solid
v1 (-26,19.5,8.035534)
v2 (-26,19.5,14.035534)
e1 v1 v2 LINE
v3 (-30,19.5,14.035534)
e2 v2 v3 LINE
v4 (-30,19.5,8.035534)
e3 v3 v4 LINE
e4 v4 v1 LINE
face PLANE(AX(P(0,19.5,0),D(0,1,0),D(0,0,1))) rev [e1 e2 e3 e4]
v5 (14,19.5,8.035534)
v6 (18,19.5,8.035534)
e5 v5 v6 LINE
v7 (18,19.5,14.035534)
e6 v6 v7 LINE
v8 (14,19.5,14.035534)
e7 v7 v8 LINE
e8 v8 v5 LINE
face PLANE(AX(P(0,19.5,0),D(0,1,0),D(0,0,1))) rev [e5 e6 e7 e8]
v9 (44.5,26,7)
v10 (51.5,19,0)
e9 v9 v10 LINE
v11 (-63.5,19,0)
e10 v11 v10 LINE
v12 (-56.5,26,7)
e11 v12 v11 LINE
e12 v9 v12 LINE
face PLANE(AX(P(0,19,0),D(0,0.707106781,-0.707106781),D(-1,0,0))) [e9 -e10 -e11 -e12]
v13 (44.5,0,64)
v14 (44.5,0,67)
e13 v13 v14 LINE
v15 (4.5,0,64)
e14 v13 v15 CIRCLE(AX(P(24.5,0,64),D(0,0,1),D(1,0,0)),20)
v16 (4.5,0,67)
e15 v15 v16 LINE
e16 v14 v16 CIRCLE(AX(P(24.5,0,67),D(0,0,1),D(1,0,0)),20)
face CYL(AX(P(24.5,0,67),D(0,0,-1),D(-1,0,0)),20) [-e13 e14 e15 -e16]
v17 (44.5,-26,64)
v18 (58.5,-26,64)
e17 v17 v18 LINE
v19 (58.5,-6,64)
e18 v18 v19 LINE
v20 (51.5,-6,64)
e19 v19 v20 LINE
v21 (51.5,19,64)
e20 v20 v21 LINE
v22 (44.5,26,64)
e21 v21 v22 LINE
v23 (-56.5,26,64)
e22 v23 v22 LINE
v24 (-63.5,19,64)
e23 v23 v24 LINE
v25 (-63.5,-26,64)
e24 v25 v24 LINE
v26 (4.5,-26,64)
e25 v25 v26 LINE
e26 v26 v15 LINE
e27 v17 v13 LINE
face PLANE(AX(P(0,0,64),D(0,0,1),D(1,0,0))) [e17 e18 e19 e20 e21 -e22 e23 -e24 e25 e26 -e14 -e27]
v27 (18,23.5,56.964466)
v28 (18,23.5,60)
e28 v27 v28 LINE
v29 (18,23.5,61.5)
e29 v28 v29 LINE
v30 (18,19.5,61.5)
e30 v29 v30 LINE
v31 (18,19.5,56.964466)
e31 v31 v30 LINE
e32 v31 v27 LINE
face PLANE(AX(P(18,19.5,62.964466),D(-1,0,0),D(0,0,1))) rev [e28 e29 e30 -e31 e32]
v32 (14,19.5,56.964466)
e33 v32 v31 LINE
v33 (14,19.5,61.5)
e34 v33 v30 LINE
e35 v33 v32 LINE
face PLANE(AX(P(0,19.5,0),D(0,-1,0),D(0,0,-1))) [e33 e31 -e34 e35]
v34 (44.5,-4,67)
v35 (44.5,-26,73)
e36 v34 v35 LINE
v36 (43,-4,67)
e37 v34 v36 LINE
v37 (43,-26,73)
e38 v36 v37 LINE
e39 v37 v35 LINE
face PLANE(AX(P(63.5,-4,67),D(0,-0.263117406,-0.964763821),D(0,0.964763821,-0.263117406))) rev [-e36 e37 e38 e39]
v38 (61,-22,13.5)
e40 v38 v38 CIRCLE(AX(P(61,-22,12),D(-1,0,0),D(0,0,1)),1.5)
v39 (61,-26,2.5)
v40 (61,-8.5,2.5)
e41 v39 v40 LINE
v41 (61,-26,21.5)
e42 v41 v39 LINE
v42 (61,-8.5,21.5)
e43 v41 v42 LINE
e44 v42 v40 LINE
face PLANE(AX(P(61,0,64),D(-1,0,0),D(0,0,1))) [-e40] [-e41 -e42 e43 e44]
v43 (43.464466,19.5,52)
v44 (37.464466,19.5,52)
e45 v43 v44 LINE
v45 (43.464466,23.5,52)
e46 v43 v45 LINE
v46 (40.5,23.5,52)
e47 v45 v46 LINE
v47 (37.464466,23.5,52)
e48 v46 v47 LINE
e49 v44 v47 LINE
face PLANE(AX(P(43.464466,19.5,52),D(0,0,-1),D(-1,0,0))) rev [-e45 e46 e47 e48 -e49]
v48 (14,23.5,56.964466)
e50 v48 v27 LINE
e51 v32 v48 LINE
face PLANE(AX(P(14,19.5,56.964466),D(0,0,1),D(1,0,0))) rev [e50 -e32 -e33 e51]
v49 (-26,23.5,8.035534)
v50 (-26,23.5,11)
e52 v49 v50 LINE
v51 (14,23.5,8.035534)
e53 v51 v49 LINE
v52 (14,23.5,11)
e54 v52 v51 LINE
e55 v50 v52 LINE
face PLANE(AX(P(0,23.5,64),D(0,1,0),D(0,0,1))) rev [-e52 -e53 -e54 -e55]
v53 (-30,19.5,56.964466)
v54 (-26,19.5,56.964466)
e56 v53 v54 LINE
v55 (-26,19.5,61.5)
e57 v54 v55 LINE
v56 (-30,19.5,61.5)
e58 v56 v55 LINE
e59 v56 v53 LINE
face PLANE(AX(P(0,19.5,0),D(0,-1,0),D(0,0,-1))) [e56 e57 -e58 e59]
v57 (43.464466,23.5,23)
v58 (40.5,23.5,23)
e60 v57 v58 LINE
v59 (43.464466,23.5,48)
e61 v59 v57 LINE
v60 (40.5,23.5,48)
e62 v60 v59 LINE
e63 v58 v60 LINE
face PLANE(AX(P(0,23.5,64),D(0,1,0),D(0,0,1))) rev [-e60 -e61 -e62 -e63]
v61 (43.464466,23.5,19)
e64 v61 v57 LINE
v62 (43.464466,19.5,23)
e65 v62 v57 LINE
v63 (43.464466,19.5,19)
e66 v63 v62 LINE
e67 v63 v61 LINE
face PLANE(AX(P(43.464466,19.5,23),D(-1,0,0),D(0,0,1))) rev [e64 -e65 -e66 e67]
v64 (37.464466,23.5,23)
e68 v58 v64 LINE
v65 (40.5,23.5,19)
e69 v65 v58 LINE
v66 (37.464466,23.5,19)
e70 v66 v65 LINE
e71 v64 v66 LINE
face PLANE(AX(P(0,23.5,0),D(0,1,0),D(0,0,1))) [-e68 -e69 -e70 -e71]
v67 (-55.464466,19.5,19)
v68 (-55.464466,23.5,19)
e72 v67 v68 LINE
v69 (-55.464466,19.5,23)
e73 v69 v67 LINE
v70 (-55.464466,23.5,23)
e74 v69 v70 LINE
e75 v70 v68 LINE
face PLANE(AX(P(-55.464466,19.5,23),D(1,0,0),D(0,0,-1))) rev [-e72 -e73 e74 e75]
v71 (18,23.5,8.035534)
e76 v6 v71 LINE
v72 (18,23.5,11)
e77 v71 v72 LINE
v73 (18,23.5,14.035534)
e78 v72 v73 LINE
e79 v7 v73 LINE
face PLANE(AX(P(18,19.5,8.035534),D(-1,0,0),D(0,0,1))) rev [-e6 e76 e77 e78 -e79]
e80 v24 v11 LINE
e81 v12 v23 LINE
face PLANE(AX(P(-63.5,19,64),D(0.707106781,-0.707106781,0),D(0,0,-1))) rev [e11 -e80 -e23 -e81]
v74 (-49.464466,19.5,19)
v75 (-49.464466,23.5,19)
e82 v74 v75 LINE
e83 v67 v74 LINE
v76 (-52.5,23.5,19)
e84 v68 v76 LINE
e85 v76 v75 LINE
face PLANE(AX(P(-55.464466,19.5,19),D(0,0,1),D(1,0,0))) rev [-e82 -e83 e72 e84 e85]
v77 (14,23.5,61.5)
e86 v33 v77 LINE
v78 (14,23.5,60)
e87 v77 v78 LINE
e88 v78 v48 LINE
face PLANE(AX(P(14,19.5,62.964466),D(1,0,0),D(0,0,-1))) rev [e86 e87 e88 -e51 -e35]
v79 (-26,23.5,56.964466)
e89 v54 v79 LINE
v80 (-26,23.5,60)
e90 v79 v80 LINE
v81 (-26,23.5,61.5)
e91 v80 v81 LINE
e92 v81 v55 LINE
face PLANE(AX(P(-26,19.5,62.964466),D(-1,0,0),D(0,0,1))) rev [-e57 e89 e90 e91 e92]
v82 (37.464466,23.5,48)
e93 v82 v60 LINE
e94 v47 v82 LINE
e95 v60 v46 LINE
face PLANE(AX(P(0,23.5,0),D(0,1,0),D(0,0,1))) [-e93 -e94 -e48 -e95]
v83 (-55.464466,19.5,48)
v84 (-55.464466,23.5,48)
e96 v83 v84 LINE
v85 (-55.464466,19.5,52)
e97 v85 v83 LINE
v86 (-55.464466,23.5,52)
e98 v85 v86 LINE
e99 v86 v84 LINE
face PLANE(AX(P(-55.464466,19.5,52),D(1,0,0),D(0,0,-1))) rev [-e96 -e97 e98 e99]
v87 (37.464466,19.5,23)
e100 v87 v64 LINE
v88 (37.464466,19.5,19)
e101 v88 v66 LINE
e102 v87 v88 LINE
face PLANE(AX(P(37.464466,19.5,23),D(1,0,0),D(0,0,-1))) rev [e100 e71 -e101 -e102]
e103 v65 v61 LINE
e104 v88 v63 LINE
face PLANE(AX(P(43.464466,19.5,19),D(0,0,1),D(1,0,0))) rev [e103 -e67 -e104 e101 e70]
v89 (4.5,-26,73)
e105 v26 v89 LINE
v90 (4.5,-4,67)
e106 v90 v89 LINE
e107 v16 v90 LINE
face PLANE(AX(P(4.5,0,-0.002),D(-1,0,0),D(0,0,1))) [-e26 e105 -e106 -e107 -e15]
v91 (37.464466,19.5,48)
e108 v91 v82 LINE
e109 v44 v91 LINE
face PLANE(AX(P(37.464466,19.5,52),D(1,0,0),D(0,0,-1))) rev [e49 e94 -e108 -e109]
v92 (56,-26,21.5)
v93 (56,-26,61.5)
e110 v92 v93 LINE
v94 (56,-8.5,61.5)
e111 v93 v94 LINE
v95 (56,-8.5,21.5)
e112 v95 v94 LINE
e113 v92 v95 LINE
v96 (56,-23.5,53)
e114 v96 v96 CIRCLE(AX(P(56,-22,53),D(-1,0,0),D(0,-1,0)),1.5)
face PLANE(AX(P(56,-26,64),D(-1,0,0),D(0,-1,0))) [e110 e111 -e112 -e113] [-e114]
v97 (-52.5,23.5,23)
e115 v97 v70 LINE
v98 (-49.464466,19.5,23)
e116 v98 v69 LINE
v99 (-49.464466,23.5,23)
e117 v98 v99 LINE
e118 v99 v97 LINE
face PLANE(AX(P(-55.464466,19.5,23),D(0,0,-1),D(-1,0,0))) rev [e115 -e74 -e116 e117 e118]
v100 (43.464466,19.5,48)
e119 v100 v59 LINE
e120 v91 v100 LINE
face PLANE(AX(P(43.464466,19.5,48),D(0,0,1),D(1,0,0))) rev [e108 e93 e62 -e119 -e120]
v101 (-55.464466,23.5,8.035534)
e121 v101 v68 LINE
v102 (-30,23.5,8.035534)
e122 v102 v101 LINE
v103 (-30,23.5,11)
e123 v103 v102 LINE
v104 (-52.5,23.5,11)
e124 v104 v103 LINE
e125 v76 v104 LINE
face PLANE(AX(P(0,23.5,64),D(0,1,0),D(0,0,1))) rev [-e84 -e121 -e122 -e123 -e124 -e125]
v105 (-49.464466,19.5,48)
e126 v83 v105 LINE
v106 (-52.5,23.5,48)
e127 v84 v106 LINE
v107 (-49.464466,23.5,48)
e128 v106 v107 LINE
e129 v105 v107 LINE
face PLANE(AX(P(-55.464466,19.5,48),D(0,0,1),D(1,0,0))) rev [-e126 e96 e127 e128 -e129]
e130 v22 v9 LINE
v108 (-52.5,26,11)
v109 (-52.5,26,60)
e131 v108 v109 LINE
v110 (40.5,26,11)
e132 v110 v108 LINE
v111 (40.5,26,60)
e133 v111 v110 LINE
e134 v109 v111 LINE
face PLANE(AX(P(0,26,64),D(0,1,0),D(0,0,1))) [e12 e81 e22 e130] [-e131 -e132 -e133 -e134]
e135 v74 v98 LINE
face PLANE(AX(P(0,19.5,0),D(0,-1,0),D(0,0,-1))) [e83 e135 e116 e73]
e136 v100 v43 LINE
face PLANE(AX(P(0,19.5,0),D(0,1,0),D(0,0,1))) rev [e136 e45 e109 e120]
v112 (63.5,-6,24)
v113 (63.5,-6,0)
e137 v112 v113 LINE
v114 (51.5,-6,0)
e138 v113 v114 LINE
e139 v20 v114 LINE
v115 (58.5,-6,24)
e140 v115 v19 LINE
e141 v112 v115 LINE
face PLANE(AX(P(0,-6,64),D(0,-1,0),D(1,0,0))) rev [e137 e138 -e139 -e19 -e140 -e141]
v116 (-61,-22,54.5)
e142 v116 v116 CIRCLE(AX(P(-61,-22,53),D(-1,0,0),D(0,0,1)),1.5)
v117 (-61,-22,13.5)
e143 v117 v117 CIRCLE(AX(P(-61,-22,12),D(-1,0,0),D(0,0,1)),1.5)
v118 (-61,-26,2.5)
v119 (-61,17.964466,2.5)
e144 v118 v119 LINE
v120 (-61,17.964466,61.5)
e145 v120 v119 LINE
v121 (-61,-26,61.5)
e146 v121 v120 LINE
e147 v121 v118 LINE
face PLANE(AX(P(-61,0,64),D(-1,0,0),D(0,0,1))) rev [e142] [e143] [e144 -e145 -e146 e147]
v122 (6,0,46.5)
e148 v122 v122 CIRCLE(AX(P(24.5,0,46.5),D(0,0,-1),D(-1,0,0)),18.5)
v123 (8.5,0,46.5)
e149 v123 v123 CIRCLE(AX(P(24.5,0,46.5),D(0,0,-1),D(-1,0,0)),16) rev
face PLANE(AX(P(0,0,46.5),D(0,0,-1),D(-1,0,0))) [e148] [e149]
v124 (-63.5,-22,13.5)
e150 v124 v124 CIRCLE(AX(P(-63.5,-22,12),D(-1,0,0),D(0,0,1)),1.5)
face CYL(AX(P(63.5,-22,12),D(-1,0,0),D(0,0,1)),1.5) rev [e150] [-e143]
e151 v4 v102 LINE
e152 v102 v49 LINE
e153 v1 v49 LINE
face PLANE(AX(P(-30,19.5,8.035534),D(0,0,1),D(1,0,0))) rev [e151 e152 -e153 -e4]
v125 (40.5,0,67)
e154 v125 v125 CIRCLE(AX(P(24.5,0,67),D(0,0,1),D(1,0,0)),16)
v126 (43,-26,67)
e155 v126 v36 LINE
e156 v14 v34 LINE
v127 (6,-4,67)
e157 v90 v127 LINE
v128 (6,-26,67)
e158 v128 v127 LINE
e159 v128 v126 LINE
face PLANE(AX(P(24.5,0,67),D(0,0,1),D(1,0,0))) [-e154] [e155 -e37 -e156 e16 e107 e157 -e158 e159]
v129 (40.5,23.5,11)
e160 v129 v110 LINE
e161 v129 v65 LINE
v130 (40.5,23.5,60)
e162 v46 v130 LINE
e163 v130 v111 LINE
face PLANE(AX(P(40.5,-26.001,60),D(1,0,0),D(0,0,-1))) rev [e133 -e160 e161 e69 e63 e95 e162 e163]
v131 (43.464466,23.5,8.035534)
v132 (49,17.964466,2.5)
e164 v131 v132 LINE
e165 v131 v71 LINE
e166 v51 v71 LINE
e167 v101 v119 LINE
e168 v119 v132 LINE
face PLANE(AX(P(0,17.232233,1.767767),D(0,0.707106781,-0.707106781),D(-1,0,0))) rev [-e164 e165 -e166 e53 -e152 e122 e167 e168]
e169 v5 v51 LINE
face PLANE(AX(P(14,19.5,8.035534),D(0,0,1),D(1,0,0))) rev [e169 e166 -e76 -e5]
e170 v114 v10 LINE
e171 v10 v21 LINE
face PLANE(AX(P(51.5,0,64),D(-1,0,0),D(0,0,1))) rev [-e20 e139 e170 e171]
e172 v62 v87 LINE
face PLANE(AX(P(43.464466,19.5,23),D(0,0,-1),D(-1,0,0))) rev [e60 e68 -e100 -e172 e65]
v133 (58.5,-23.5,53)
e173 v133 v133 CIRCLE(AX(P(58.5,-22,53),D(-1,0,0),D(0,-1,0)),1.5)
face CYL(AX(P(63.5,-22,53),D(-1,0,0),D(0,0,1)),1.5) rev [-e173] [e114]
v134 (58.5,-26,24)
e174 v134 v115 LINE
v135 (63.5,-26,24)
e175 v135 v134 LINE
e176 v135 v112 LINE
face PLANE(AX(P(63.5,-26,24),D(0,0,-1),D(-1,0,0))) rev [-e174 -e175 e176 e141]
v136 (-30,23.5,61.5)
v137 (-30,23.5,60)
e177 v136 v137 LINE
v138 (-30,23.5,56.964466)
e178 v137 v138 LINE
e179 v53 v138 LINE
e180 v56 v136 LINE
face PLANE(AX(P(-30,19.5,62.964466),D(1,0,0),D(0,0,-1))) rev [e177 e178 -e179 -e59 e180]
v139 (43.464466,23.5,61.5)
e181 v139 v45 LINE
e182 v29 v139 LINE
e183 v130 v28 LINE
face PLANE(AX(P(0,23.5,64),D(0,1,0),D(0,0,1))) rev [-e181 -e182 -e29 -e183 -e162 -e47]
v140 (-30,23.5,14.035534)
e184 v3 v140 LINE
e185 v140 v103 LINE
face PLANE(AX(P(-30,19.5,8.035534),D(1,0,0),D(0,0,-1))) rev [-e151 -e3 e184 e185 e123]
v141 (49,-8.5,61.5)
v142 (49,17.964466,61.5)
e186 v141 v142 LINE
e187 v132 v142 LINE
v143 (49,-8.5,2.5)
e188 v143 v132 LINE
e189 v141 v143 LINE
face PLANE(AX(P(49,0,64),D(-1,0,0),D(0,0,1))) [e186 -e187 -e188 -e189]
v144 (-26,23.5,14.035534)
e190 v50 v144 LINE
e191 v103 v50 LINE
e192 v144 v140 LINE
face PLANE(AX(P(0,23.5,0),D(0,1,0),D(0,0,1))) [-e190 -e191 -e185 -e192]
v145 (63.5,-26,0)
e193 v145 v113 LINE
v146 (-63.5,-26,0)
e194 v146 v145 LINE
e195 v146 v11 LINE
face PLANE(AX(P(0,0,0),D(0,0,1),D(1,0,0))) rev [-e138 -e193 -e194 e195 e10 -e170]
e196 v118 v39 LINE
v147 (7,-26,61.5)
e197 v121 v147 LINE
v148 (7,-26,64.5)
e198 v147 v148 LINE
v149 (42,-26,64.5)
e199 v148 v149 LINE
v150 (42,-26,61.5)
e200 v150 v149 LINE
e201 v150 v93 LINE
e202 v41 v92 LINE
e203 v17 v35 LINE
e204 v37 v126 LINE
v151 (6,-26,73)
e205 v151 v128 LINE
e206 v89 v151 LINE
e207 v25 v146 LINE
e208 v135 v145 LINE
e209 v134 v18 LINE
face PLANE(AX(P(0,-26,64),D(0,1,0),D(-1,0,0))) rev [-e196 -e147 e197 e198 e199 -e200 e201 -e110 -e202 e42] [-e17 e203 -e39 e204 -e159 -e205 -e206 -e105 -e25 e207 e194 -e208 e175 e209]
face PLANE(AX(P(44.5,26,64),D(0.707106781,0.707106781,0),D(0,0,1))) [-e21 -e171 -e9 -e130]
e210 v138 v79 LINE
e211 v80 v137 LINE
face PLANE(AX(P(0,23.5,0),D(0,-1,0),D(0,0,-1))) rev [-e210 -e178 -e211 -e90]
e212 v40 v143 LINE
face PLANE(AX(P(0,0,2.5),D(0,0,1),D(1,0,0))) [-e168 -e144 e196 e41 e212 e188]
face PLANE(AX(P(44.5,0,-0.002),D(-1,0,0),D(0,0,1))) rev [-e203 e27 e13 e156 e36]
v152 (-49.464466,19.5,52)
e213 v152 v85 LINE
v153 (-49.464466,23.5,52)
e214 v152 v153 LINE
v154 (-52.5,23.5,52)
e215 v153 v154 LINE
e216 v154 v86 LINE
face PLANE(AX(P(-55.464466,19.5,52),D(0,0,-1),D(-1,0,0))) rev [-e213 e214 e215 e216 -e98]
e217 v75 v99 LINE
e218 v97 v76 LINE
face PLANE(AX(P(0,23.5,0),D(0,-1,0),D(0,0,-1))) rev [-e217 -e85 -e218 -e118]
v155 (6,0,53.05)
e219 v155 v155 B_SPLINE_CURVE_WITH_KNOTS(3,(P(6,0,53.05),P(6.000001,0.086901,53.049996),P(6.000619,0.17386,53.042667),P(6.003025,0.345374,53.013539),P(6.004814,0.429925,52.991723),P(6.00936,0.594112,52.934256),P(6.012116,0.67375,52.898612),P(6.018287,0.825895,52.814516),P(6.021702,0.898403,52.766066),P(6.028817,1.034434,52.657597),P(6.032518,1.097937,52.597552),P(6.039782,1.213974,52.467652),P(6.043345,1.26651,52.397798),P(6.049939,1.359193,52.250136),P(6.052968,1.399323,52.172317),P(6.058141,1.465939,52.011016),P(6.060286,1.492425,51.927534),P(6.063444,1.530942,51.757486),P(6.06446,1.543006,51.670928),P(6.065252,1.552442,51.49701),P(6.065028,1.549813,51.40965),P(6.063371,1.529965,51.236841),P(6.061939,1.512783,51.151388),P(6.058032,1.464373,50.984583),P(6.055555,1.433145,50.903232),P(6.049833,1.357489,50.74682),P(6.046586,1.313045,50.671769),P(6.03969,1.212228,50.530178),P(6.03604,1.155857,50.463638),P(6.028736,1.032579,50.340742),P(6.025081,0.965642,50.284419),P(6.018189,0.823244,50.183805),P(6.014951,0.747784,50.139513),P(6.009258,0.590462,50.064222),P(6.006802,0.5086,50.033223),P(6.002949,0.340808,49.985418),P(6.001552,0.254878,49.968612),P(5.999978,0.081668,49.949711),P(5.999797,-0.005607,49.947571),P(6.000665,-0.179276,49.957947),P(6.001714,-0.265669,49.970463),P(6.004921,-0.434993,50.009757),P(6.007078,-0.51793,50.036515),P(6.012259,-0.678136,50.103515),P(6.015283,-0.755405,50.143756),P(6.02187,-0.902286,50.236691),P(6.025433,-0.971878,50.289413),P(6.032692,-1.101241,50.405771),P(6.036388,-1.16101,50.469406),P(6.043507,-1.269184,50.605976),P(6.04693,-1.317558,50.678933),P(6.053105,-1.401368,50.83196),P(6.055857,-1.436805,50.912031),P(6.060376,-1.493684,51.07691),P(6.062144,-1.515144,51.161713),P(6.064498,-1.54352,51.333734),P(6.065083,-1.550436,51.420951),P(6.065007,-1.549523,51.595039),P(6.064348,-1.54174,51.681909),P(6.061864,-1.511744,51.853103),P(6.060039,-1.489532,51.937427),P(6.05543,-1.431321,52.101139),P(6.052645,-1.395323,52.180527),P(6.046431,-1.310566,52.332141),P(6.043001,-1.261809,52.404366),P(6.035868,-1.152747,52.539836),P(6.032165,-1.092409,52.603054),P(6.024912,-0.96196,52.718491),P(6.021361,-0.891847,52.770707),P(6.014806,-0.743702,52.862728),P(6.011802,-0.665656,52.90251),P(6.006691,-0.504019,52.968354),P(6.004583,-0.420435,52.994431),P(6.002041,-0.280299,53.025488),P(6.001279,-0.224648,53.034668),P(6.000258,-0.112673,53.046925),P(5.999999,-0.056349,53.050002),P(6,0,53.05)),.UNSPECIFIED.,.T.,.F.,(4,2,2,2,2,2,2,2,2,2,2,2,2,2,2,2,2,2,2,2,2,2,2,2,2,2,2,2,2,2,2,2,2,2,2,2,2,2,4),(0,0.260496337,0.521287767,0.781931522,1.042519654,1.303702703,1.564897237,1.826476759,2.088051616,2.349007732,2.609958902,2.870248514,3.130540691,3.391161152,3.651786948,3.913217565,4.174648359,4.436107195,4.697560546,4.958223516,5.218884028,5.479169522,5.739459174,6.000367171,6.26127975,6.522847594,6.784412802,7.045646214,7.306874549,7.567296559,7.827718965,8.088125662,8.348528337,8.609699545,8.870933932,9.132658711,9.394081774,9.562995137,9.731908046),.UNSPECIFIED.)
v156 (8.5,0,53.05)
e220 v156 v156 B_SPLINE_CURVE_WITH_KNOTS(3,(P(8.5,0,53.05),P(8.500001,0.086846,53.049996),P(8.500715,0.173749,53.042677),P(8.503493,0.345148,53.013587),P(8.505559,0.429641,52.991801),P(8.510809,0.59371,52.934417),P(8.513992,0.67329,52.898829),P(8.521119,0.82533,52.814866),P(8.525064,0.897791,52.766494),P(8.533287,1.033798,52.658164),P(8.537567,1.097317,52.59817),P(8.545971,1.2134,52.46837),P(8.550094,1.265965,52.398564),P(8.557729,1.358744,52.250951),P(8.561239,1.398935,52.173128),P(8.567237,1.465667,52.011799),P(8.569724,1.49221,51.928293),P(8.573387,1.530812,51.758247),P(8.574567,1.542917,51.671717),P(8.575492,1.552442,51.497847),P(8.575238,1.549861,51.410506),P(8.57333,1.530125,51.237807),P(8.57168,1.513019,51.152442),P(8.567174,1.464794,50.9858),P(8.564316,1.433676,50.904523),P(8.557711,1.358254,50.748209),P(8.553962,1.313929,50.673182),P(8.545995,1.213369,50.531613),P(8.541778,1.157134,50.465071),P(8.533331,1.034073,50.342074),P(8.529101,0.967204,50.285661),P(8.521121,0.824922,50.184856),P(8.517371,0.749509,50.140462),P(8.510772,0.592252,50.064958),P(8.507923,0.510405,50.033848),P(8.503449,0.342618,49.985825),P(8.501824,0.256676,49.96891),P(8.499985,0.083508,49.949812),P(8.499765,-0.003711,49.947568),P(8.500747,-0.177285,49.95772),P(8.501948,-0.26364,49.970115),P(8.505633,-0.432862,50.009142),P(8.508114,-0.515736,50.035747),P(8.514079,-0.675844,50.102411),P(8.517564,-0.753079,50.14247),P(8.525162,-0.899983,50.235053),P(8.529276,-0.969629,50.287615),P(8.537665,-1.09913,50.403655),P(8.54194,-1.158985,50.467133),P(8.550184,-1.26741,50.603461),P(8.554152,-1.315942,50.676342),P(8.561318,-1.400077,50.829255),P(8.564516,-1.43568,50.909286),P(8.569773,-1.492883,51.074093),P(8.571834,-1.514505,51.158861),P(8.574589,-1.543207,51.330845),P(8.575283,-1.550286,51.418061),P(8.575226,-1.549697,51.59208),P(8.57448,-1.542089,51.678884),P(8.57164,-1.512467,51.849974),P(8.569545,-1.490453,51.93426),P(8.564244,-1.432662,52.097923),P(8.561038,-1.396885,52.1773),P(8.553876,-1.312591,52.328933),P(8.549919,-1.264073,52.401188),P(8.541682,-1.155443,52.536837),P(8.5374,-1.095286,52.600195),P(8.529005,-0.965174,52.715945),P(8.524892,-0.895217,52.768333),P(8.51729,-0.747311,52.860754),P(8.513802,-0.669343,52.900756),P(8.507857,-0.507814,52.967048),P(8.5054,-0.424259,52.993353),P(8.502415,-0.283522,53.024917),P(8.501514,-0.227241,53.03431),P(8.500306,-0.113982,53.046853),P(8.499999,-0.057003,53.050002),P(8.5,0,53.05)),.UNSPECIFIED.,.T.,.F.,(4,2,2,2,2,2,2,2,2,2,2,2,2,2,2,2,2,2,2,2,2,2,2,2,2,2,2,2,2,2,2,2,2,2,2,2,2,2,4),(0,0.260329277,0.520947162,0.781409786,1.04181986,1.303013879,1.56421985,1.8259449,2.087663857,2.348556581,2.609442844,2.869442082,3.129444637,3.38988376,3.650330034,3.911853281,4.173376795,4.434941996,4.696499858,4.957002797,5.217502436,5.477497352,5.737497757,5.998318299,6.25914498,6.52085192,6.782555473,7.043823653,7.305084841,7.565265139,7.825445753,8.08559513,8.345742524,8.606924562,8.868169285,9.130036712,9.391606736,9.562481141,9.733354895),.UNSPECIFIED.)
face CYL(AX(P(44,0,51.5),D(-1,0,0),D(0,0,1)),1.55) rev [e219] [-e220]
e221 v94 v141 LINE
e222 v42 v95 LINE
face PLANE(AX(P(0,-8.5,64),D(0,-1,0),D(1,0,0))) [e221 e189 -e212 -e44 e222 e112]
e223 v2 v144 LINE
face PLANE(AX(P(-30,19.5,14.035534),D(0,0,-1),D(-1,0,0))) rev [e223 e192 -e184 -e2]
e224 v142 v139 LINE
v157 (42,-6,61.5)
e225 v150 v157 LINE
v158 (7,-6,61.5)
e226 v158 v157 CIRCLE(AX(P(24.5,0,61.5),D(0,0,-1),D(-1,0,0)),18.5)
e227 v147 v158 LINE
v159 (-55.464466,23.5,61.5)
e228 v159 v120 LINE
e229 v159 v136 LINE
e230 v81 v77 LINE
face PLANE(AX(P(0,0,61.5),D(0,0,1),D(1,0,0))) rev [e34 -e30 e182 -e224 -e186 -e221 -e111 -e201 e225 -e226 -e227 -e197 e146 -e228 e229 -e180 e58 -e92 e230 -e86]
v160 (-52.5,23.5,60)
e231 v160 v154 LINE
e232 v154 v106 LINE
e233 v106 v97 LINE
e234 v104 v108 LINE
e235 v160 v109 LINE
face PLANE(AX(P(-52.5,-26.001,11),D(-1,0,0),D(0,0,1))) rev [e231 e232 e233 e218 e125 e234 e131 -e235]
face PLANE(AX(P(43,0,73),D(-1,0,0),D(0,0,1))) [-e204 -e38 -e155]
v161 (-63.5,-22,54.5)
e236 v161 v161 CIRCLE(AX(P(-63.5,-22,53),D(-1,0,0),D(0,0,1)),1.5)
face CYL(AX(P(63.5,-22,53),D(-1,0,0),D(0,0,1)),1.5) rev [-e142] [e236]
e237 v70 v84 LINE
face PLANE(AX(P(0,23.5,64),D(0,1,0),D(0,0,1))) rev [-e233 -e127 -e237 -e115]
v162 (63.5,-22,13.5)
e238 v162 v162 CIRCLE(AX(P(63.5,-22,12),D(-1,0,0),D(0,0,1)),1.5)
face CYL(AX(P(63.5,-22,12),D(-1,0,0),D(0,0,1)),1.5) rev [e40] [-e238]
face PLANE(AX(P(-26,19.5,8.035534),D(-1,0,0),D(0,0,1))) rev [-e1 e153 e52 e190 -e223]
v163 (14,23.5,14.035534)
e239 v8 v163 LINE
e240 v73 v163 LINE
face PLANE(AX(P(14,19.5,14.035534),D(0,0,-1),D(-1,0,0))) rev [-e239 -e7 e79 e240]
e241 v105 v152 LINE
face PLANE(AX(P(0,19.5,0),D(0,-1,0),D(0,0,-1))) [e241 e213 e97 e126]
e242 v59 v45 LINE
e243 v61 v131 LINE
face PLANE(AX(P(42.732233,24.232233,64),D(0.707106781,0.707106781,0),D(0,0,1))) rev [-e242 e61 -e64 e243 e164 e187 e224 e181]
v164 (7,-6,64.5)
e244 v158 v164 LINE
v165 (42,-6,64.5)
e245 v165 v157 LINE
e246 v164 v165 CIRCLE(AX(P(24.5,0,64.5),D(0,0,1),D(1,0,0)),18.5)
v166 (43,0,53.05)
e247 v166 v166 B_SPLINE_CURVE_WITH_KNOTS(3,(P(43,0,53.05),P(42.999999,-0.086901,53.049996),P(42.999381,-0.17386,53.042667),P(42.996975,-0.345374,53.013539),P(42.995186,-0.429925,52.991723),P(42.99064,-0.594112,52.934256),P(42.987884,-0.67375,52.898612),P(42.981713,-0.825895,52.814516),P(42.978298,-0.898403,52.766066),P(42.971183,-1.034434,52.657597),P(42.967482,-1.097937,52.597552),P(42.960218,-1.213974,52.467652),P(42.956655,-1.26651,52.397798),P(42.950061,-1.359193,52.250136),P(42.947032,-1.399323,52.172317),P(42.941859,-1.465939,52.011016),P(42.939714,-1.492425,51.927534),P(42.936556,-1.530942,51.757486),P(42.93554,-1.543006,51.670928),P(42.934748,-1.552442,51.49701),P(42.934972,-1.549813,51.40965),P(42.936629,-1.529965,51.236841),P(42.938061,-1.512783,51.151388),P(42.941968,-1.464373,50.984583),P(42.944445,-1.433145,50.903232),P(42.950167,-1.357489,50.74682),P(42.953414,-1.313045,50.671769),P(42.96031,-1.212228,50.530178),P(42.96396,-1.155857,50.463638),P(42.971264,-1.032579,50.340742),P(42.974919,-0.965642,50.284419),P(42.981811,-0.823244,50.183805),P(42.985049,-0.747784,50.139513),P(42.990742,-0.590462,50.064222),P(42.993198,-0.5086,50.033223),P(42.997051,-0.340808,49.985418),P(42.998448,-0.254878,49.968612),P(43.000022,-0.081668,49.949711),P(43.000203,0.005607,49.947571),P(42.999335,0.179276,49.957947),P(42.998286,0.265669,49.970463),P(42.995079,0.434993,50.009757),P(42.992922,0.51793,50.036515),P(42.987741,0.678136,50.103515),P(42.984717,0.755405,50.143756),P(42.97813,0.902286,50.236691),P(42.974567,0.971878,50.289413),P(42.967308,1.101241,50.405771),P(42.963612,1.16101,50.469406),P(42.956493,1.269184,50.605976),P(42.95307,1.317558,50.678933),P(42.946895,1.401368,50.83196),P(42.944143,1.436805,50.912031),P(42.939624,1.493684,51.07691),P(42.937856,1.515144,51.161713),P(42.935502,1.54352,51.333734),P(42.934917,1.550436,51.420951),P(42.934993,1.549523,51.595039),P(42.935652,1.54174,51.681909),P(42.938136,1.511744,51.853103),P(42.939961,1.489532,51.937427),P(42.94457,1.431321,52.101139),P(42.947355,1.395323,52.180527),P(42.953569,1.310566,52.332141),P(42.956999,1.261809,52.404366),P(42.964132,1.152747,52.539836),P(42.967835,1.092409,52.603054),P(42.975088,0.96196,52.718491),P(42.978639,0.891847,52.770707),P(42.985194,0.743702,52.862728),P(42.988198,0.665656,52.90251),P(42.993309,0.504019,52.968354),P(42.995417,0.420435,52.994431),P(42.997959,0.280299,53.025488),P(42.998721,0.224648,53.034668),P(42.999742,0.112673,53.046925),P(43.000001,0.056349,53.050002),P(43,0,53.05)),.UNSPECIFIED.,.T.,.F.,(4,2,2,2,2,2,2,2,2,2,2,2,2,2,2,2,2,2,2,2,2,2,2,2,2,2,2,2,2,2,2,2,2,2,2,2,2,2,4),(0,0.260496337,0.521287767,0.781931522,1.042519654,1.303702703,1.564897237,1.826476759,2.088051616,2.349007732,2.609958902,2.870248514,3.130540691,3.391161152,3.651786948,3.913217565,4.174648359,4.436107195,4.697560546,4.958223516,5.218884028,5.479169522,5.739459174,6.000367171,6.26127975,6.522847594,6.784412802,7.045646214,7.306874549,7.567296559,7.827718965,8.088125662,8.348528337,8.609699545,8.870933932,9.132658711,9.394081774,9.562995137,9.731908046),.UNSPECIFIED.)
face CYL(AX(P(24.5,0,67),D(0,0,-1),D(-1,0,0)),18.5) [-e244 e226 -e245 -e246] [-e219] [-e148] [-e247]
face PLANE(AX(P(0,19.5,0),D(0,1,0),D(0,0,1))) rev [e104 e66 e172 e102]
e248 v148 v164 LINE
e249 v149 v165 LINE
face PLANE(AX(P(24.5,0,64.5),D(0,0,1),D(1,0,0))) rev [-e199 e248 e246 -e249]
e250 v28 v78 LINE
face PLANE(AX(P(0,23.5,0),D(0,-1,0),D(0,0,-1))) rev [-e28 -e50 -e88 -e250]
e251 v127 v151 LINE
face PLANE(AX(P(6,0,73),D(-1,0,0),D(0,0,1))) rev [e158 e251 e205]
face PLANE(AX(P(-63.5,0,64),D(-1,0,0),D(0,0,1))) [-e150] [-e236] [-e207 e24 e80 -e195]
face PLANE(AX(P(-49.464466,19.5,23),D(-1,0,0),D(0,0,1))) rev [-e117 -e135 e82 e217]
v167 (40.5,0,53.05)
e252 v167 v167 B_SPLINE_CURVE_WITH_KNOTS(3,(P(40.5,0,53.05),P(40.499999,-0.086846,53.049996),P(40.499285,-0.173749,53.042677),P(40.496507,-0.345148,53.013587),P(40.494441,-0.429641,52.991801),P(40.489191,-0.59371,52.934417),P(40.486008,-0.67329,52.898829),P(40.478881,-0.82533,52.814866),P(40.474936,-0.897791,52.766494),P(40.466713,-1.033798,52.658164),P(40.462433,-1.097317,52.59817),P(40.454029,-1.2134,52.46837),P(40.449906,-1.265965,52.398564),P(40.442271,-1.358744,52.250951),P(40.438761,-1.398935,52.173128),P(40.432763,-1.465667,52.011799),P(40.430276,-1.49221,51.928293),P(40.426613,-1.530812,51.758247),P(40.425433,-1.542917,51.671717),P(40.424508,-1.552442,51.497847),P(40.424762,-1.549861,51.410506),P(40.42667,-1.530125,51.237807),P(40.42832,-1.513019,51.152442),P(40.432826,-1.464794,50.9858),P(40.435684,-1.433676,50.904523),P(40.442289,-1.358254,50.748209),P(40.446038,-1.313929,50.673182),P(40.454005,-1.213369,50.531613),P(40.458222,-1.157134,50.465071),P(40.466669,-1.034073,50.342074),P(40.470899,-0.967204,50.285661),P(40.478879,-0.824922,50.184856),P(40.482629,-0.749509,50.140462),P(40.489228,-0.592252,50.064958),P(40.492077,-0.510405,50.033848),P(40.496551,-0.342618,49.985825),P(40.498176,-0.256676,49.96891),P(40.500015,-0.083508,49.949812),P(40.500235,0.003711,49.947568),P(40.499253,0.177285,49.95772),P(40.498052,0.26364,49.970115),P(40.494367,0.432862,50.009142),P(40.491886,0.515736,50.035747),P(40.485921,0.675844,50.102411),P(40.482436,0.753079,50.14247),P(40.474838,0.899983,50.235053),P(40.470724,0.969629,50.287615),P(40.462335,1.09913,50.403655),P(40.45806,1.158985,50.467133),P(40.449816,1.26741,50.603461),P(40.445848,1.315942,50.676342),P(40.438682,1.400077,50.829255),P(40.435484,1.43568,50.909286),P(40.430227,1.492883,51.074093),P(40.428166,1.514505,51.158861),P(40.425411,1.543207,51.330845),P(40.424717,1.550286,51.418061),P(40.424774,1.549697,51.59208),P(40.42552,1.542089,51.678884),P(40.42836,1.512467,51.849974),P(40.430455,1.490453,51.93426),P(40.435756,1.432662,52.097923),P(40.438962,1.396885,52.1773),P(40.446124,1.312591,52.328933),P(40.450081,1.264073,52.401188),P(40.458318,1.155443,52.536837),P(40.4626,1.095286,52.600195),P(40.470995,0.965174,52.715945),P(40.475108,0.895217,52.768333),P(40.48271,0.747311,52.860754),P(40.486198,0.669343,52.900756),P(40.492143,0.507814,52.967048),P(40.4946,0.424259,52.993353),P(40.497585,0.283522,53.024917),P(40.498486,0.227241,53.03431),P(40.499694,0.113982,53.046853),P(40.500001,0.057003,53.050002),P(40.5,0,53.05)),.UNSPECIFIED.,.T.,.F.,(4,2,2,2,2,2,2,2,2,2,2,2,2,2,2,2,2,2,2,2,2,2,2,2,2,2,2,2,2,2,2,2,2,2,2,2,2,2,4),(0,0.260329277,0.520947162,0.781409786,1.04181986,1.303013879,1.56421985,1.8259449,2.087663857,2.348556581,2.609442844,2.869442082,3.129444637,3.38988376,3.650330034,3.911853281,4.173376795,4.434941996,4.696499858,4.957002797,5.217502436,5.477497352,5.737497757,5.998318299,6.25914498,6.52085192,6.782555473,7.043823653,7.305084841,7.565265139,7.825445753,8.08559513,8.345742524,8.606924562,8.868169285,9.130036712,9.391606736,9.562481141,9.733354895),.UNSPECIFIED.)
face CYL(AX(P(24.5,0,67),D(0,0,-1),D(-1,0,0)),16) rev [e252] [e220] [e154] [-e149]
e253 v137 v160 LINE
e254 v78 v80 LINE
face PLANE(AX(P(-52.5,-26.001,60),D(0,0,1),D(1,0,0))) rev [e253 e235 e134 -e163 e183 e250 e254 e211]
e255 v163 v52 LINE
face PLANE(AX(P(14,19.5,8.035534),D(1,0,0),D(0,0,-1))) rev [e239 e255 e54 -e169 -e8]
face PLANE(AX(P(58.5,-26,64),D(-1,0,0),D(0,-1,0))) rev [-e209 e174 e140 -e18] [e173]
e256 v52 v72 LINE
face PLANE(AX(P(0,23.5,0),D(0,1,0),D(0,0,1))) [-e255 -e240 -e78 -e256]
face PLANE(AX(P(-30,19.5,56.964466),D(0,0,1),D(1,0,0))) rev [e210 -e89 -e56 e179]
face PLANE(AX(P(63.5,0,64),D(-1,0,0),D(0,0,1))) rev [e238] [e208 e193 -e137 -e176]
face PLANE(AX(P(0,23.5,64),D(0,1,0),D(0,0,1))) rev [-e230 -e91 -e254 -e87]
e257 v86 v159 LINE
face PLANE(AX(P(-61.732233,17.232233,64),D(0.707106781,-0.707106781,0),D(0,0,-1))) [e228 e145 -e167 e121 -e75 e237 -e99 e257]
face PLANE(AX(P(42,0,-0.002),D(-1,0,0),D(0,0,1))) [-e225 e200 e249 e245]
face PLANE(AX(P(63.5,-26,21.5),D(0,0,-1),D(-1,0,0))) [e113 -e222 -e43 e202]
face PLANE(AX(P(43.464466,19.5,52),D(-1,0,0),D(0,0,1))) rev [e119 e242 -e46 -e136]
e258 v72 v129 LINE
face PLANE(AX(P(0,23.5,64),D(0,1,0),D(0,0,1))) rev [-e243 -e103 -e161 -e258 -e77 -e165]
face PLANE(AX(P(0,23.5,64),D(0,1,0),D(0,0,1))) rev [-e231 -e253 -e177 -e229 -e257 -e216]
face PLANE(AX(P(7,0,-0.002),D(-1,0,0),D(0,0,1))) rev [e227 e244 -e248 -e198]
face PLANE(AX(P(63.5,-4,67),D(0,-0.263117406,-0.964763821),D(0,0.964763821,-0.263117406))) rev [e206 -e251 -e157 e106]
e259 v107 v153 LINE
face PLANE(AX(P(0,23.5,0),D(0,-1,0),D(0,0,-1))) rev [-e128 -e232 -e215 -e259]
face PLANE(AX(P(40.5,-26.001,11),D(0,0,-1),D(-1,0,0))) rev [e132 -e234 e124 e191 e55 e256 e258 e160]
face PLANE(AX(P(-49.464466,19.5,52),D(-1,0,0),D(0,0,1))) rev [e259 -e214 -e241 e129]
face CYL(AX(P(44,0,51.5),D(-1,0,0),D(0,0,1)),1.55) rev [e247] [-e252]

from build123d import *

# Parameters (mm, degrees)
BOSS_EXTRUDE1_DEPTH = 64
SKETCH2_R           = 20
SKETCH2_R_2         = 16
BOSS_EXTRUDE2_DEPTH = 3
CHAMFER1_SIZE       = 7
BOSS_EXTRUDE3_REACH = 97.902
SKETCH4_W           = 1.5
SKETCH4_H           = 22
BOSS_EXTRUDE4_DEPTH = 6
CUT_EXTRUDE1_DEPTH  = 104.097041665
SKETCH6_W           = 5
SKETCH6_H           = 40
CUT_EXTRUDE2_DEPTH  = 102.908046787
SHELL1_START        = 2.5
SHELL1_DEPTH        = 59
SHELL1_2_OUTLINE_W  = 5
SHELL1_2_OUTLINE_H  = 17.5
SHELL1_2_DEPTH      = 19
SHELL1_START_2      = 61.5
SHELL1_3_DEPTH      = 3
SHELL1_START_3      = 10.935028843
SHELL1_4_DEPTH      = 2.5
CUT_EXTRUDE3_REACH  = 95.831
SKETCH7_R           = 16
BOSS_EXTRUDE5_START = 15
SKETCH8_R           = 16
BOSS_EXTRUDE5_DEPTH = 15
CUT_EXTRUDE4_REACH  = 111.842
SKETCH9_W           = 93
SKETCH9_H           = 49
SKETCH10_W          = 6
SKETCH10_H          = 4
SKETCH10_W_2        = 4
SKETCH10_H_2        = 6
BOSS_EXTRUDE6_DEPTH = 4
SKETCH11_R          = 1.5
CUT_EXTRUDE5_DEPTH  = 149.7749979
SKETCH12_R          = 1.55
CUT_EXTRUDE6_DEPTH  = 44


with BuildPart() as part:
    # Sketch1 → Boss-Extrude1 (new body)
    with BuildSketch(Plane.XY):
        Polygon((63.5, -26), (63.5, -6), (51.5, -6), (51.5, 26), (-63.5, 26), (-63.5, -26), align=None)
    extrude(amount=BOSS_EXTRUDE1_DEPTH)

    # Sketch2 → Boss-Extrude2 (add)
    with BuildSketch(Plane.XY.offset(64)):
        with Locations((24.5, 0)):
            Circle(SKETCH2_R)
        with Locations((24.5, 0)):
            Circle(SKETCH2_R_2, mode=Mode.SUBTRACT)
    extrude(amount=BOSS_EXTRUDE2_DEPTH)

    # Chamfer1
    chamfer1_edges = [part.edges().sort_by_distance(p)[0] for p in [
        (-63.5, 26, 32),
        (51.5, 26, 32),
        (-6, 26, 0),
    ]]
    chamfer(chamfer1_edges, length=CHAMFER1_SIZE)

    # Sketch3 → Boss-Extrude3 (add, up to next)
    with BuildSketch(Plane.XY.offset(67), mode=Mode.PRIVATE) as boss_extrude3_sk1:
        with BuildLine():
            ThreePointArc((6.5, -8.717797887), (5.00641131, -4.472135955), (4.5, 0))
            Line((4.5, 0), (4.5, -26))
            Line((4.5, -26), (6.5, -26))
            Line((6.5, -26), (6.5, -8.717797887))
        make_face()
    boss_extrude3_tool1 = extrude(boss_extrude3_sk1.sketch, amount=-BOSS_EXTRUDE3_REACH, mode=Mode.PRIVATE) - part.part
    # Sketch3 → Boss-Extrude3 (add, up to next)
    with BuildSketch(Plane.XY.offset(67), mode=Mode.PRIVATE) as boss_extrude3_sk2:
        with BuildLine():
            Line((44.5, -26), (44.5, 0))
            ThreePointArc((44.5, 0), (43.99358869, -4.472135955), (42.5, -8.717797887))
            Line((42.5, -8.717797887), (42.5, -26))
            Line((42.5, -26), (44.5, -26))
        make_face()
    boss_extrude3_tool2 = extrude(boss_extrude3_sk2.sketch, amount=-BOSS_EXTRUDE3_REACH, mode=Mode.PRIVATE) - part.part
    # Sketch3 → Boss-Extrude3 (add, up to next)
    with BuildSketch(Plane.XY.offset(67), mode=Mode.PRIVATE) as boss_extrude3_sk3:
        with BuildLine():
            ThreePointArc((42.5, -8.717797887), (24.5, -20), (6.5, -8.717797887))
            Line((6.5, -8.717797887), (6.5, -26))
            Line((6.5, -26), (42.5, -26))
            Line((42.5, -26), (42.5, -8.717797887))
        make_face()
    boss_extrude3_tool3 = extrude(boss_extrude3_sk3.sketch, amount=-BOSS_EXTRUDE3_REACH, mode=Mode.PRIVATE) - part.part
    add(boss_extrude3_tool1.solids().sort_by_distance((5.442676, -15.832473, 67))[0])
    add(boss_extrude3_tool2.solids().sort_by_distance((43.557324, -15.832473, 67))[0])
    add(boss_extrude3_tool3.solids().sort_by_distance((24.5, -20.87134, 67))[0])

    # Sketch4 → Boss-Extrude4 (add)
    with BuildSketch(Plane.XY.offset(67)):
        with Locations((43.75, -15)):
            Rectangle(SKETCH4_W, SKETCH4_H)
        with Locations((5.25, -15)):
            Rectangle(SKETCH4_W, SKETCH4_H)
    extrude(amount=BOSS_EXTRUDE4_DEPTH)

    # Sketch5 → Cut-Extrude1 (cut, through all)
    with BuildSketch(Plane.ZY.offset(-4.5)):
        Polygon((67, -4), (73, -26), (73, -4), align=None)
    extrude(amount=-CUT_EXTRUDE1_DEPTH, mode=Mode.SUBTRACT)

    # Sketch6 → Cut-Extrude2 (cut, through all)
    with BuildSketch(Plane(origin=(0, -6, 0), x_dir=(1, 0, 0), z_dir=(0, 1, 0))):
        with Locations((61, -44)):
            Rectangle(SKETCH6_W, SKETCH6_H)
    extrude(amount=-CUT_EXTRUDE2_DEPTH, mode=Mode.SUBTRACT)

    # Shell1: read off the stored shape, not the designer's step
    # Shell1 outline → Shell1 (cut)
    with BuildSketch(Plane.XY.offset(SHELL1_START)):
        Polygon((56, -8.5), (49, -8.5), (49, 17.964466094), (43.464466094, 23.5), (-55.464466094, 23.5), (-61, 17.964466094), (-61, -26), (56, -26), align=None)
    extrude(amount=SHELL1_DEPTH, mode=Mode.SUBTRACT)

    # Shell1 2 outline → Shell1 2 (cut)
    with BuildSketch(Plane.XY.offset(SHELL1_START)):
        with Locations((58.5, -17.25)):
            Rectangle(SHELL1_2_OUTLINE_W, SHELL1_2_OUTLINE_H)
    extrude(amount=SHELL1_2_DEPTH, mode=Mode.SUBTRACT)

    # Shell1 3 outline → Shell1 3 (cut)
    with BuildSketch(Plane.XY.offset(SHELL1_START_2)):
        with BuildLine():
            Line((7, -26), (42, -26))
            Line((42, -26), (42, -6))
            ThreePointArc((42, -6), (24.5, -18.5), (7, -6))
            Line((7, -6), (7, -26))
        make_face()
    extrude(amount=SHELL1_3_DEPTH, mode=Mode.SUBTRACT)

    # Shell1 4 outline → Shell1 4 (add)
    with BuildSketch(Plane(origin=(0, 0, 0), x_dir=(1, 0, 0), z_dir=(0, 0.707106781186545, -0.70710678118655)).offset(SHELL1_START_3)):
        Polygon((43.464466094, -22.298989873), (49, -14.470562748), (-61, -14.470562748), (-55.464466094, -22.298989873), align=None)
    extrude(amount=SHELL1_4_DEPTH)

    # Sketch7 → Cut-Extrude3 (cut, up to next)
    with BuildSketch(Plane.XY.offset(64), mode=Mode.PRIVATE) as cut_extrude3_sk1:
        with Locations((24.5, 0)):
            Circle(SKETCH7_R)
    cut_extrude3_tool1 = extrude(cut_extrude3_sk1.sketch, amount=-CUT_EXTRUDE3_REACH, mode=Mode.PRIVATE) & part.part
    add(cut_extrude3_tool1.solids().sort_by_distance((24.5, 0, 64))[0], mode=Mode.SUBTRACT)

    # Sketch8 → Boss-Extrude5 (add)
    with BuildSketch(Plane(origin=(0, 0, 61.5), x_dir=(-1, 0, 0), z_dir=(0, 0, -1)).offset(BOSS_EXTRUDE5_START)):
        with BuildLine():
            ThreePointArc((-6, 0), (-27.541381265, 18.248287591), (-42, -6))
            ThreePointArc((-42, -6), (-24.5, -18.5), (-7, -6))
            ThreePointArc((-7, -6), (-6.251712409, -3.041381265), (-6, 0))
        make_face()
        with Locations((-24.5, 0)):
            Circle(SKETCH8_R, mode=Mode.SUBTRACT)
    extrude(amount=-BOSS_EXTRUDE5_DEPTH)

    # Sketch9 → Cut-Extrude4 (cut, up to next)
    with BuildSketch(Plane(origin=(0, 26, 0), x_dir=(1, 0, 0), z_dir=(0, 1, 0)), mode=Mode.PRIVATE) as cut_extrude4_sk1:
        with Locations((-6, -35.5)):
            Rectangle(SKETCH9_W, SKETCH9_H)
    cut_extrude4_tool1 = extrude(cut_extrude4_sk1.sketch, amount=-CUT_EXTRUDE4_REACH, mode=Mode.PRIVATE) & part.part
    add(cut_extrude4_tool1.solids().sort_by_distance((-6, 26, 35.5))[0], mode=Mode.SUBTRACT)

    # Sketch10 → Boss-Extrude6 (add)
    with BuildSketch(Plane.XZ.offset(-23.5)):
        with Locations((-52.464466094, 50)):
            Rectangle(SKETCH10_W, SKETCH10_H)
        with Locations((-52.464466094, 21)):
            Rectangle(SKETCH10_W, SKETCH10_H)
        with Locations((40.464466094, 21)):
            Rectangle(SKETCH10_W, SKETCH10_H)
        with Locations((40.464466094, 50)):
            Rectangle(SKETCH10_W, SKETCH10_H)
        with Locations((-28, 11.035533906)):
            Rectangle(SKETCH10_W_2, SKETCH10_H_2)
        with Locations((16, 11.035533906)):
            Rectangle(SKETCH10_W_2, SKETCH10_H_2)
        with Locations((16, 59.964466094)):
            Rectangle(SKETCH10_W_2, SKETCH10_H_2)
        with Locations((-28, 59.964466094)):
            Rectangle(SKETCH10_W_2, SKETCH10_H_2)
    extrude(amount=BOSS_EXTRUDE6_DEPTH)

    # Sketch11 → Cut-Extrude5 (cut, through all)
    with BuildSketch(Plane.ZY.offset(63.5)):
        with Locations(Location((53, -22, 0), (0, 0, 270))):
            Circle(SKETCH11_R)
        with Locations((12, -22)):
            Circle(SKETCH11_R)
    extrude(amount=-CUT_EXTRUDE5_DEPTH, mode=Mode.SUBTRACT)

    # Sketch12 → Cut-Extrude6 (cut)
    with BuildSketch(Plane(origin=(0, 0, 0), x_dir=(0, 0, -1), z_dir=(1, 0, 0))):
        with Locations(Location((-51.5, 0, 0), (0, 0, 180))):
            Circle(SKETCH12_R)
    extrude(amount=CUT_EXTRUDE6_DEPTH, mode=Mode.SUBTRACT)


solid = part.part
